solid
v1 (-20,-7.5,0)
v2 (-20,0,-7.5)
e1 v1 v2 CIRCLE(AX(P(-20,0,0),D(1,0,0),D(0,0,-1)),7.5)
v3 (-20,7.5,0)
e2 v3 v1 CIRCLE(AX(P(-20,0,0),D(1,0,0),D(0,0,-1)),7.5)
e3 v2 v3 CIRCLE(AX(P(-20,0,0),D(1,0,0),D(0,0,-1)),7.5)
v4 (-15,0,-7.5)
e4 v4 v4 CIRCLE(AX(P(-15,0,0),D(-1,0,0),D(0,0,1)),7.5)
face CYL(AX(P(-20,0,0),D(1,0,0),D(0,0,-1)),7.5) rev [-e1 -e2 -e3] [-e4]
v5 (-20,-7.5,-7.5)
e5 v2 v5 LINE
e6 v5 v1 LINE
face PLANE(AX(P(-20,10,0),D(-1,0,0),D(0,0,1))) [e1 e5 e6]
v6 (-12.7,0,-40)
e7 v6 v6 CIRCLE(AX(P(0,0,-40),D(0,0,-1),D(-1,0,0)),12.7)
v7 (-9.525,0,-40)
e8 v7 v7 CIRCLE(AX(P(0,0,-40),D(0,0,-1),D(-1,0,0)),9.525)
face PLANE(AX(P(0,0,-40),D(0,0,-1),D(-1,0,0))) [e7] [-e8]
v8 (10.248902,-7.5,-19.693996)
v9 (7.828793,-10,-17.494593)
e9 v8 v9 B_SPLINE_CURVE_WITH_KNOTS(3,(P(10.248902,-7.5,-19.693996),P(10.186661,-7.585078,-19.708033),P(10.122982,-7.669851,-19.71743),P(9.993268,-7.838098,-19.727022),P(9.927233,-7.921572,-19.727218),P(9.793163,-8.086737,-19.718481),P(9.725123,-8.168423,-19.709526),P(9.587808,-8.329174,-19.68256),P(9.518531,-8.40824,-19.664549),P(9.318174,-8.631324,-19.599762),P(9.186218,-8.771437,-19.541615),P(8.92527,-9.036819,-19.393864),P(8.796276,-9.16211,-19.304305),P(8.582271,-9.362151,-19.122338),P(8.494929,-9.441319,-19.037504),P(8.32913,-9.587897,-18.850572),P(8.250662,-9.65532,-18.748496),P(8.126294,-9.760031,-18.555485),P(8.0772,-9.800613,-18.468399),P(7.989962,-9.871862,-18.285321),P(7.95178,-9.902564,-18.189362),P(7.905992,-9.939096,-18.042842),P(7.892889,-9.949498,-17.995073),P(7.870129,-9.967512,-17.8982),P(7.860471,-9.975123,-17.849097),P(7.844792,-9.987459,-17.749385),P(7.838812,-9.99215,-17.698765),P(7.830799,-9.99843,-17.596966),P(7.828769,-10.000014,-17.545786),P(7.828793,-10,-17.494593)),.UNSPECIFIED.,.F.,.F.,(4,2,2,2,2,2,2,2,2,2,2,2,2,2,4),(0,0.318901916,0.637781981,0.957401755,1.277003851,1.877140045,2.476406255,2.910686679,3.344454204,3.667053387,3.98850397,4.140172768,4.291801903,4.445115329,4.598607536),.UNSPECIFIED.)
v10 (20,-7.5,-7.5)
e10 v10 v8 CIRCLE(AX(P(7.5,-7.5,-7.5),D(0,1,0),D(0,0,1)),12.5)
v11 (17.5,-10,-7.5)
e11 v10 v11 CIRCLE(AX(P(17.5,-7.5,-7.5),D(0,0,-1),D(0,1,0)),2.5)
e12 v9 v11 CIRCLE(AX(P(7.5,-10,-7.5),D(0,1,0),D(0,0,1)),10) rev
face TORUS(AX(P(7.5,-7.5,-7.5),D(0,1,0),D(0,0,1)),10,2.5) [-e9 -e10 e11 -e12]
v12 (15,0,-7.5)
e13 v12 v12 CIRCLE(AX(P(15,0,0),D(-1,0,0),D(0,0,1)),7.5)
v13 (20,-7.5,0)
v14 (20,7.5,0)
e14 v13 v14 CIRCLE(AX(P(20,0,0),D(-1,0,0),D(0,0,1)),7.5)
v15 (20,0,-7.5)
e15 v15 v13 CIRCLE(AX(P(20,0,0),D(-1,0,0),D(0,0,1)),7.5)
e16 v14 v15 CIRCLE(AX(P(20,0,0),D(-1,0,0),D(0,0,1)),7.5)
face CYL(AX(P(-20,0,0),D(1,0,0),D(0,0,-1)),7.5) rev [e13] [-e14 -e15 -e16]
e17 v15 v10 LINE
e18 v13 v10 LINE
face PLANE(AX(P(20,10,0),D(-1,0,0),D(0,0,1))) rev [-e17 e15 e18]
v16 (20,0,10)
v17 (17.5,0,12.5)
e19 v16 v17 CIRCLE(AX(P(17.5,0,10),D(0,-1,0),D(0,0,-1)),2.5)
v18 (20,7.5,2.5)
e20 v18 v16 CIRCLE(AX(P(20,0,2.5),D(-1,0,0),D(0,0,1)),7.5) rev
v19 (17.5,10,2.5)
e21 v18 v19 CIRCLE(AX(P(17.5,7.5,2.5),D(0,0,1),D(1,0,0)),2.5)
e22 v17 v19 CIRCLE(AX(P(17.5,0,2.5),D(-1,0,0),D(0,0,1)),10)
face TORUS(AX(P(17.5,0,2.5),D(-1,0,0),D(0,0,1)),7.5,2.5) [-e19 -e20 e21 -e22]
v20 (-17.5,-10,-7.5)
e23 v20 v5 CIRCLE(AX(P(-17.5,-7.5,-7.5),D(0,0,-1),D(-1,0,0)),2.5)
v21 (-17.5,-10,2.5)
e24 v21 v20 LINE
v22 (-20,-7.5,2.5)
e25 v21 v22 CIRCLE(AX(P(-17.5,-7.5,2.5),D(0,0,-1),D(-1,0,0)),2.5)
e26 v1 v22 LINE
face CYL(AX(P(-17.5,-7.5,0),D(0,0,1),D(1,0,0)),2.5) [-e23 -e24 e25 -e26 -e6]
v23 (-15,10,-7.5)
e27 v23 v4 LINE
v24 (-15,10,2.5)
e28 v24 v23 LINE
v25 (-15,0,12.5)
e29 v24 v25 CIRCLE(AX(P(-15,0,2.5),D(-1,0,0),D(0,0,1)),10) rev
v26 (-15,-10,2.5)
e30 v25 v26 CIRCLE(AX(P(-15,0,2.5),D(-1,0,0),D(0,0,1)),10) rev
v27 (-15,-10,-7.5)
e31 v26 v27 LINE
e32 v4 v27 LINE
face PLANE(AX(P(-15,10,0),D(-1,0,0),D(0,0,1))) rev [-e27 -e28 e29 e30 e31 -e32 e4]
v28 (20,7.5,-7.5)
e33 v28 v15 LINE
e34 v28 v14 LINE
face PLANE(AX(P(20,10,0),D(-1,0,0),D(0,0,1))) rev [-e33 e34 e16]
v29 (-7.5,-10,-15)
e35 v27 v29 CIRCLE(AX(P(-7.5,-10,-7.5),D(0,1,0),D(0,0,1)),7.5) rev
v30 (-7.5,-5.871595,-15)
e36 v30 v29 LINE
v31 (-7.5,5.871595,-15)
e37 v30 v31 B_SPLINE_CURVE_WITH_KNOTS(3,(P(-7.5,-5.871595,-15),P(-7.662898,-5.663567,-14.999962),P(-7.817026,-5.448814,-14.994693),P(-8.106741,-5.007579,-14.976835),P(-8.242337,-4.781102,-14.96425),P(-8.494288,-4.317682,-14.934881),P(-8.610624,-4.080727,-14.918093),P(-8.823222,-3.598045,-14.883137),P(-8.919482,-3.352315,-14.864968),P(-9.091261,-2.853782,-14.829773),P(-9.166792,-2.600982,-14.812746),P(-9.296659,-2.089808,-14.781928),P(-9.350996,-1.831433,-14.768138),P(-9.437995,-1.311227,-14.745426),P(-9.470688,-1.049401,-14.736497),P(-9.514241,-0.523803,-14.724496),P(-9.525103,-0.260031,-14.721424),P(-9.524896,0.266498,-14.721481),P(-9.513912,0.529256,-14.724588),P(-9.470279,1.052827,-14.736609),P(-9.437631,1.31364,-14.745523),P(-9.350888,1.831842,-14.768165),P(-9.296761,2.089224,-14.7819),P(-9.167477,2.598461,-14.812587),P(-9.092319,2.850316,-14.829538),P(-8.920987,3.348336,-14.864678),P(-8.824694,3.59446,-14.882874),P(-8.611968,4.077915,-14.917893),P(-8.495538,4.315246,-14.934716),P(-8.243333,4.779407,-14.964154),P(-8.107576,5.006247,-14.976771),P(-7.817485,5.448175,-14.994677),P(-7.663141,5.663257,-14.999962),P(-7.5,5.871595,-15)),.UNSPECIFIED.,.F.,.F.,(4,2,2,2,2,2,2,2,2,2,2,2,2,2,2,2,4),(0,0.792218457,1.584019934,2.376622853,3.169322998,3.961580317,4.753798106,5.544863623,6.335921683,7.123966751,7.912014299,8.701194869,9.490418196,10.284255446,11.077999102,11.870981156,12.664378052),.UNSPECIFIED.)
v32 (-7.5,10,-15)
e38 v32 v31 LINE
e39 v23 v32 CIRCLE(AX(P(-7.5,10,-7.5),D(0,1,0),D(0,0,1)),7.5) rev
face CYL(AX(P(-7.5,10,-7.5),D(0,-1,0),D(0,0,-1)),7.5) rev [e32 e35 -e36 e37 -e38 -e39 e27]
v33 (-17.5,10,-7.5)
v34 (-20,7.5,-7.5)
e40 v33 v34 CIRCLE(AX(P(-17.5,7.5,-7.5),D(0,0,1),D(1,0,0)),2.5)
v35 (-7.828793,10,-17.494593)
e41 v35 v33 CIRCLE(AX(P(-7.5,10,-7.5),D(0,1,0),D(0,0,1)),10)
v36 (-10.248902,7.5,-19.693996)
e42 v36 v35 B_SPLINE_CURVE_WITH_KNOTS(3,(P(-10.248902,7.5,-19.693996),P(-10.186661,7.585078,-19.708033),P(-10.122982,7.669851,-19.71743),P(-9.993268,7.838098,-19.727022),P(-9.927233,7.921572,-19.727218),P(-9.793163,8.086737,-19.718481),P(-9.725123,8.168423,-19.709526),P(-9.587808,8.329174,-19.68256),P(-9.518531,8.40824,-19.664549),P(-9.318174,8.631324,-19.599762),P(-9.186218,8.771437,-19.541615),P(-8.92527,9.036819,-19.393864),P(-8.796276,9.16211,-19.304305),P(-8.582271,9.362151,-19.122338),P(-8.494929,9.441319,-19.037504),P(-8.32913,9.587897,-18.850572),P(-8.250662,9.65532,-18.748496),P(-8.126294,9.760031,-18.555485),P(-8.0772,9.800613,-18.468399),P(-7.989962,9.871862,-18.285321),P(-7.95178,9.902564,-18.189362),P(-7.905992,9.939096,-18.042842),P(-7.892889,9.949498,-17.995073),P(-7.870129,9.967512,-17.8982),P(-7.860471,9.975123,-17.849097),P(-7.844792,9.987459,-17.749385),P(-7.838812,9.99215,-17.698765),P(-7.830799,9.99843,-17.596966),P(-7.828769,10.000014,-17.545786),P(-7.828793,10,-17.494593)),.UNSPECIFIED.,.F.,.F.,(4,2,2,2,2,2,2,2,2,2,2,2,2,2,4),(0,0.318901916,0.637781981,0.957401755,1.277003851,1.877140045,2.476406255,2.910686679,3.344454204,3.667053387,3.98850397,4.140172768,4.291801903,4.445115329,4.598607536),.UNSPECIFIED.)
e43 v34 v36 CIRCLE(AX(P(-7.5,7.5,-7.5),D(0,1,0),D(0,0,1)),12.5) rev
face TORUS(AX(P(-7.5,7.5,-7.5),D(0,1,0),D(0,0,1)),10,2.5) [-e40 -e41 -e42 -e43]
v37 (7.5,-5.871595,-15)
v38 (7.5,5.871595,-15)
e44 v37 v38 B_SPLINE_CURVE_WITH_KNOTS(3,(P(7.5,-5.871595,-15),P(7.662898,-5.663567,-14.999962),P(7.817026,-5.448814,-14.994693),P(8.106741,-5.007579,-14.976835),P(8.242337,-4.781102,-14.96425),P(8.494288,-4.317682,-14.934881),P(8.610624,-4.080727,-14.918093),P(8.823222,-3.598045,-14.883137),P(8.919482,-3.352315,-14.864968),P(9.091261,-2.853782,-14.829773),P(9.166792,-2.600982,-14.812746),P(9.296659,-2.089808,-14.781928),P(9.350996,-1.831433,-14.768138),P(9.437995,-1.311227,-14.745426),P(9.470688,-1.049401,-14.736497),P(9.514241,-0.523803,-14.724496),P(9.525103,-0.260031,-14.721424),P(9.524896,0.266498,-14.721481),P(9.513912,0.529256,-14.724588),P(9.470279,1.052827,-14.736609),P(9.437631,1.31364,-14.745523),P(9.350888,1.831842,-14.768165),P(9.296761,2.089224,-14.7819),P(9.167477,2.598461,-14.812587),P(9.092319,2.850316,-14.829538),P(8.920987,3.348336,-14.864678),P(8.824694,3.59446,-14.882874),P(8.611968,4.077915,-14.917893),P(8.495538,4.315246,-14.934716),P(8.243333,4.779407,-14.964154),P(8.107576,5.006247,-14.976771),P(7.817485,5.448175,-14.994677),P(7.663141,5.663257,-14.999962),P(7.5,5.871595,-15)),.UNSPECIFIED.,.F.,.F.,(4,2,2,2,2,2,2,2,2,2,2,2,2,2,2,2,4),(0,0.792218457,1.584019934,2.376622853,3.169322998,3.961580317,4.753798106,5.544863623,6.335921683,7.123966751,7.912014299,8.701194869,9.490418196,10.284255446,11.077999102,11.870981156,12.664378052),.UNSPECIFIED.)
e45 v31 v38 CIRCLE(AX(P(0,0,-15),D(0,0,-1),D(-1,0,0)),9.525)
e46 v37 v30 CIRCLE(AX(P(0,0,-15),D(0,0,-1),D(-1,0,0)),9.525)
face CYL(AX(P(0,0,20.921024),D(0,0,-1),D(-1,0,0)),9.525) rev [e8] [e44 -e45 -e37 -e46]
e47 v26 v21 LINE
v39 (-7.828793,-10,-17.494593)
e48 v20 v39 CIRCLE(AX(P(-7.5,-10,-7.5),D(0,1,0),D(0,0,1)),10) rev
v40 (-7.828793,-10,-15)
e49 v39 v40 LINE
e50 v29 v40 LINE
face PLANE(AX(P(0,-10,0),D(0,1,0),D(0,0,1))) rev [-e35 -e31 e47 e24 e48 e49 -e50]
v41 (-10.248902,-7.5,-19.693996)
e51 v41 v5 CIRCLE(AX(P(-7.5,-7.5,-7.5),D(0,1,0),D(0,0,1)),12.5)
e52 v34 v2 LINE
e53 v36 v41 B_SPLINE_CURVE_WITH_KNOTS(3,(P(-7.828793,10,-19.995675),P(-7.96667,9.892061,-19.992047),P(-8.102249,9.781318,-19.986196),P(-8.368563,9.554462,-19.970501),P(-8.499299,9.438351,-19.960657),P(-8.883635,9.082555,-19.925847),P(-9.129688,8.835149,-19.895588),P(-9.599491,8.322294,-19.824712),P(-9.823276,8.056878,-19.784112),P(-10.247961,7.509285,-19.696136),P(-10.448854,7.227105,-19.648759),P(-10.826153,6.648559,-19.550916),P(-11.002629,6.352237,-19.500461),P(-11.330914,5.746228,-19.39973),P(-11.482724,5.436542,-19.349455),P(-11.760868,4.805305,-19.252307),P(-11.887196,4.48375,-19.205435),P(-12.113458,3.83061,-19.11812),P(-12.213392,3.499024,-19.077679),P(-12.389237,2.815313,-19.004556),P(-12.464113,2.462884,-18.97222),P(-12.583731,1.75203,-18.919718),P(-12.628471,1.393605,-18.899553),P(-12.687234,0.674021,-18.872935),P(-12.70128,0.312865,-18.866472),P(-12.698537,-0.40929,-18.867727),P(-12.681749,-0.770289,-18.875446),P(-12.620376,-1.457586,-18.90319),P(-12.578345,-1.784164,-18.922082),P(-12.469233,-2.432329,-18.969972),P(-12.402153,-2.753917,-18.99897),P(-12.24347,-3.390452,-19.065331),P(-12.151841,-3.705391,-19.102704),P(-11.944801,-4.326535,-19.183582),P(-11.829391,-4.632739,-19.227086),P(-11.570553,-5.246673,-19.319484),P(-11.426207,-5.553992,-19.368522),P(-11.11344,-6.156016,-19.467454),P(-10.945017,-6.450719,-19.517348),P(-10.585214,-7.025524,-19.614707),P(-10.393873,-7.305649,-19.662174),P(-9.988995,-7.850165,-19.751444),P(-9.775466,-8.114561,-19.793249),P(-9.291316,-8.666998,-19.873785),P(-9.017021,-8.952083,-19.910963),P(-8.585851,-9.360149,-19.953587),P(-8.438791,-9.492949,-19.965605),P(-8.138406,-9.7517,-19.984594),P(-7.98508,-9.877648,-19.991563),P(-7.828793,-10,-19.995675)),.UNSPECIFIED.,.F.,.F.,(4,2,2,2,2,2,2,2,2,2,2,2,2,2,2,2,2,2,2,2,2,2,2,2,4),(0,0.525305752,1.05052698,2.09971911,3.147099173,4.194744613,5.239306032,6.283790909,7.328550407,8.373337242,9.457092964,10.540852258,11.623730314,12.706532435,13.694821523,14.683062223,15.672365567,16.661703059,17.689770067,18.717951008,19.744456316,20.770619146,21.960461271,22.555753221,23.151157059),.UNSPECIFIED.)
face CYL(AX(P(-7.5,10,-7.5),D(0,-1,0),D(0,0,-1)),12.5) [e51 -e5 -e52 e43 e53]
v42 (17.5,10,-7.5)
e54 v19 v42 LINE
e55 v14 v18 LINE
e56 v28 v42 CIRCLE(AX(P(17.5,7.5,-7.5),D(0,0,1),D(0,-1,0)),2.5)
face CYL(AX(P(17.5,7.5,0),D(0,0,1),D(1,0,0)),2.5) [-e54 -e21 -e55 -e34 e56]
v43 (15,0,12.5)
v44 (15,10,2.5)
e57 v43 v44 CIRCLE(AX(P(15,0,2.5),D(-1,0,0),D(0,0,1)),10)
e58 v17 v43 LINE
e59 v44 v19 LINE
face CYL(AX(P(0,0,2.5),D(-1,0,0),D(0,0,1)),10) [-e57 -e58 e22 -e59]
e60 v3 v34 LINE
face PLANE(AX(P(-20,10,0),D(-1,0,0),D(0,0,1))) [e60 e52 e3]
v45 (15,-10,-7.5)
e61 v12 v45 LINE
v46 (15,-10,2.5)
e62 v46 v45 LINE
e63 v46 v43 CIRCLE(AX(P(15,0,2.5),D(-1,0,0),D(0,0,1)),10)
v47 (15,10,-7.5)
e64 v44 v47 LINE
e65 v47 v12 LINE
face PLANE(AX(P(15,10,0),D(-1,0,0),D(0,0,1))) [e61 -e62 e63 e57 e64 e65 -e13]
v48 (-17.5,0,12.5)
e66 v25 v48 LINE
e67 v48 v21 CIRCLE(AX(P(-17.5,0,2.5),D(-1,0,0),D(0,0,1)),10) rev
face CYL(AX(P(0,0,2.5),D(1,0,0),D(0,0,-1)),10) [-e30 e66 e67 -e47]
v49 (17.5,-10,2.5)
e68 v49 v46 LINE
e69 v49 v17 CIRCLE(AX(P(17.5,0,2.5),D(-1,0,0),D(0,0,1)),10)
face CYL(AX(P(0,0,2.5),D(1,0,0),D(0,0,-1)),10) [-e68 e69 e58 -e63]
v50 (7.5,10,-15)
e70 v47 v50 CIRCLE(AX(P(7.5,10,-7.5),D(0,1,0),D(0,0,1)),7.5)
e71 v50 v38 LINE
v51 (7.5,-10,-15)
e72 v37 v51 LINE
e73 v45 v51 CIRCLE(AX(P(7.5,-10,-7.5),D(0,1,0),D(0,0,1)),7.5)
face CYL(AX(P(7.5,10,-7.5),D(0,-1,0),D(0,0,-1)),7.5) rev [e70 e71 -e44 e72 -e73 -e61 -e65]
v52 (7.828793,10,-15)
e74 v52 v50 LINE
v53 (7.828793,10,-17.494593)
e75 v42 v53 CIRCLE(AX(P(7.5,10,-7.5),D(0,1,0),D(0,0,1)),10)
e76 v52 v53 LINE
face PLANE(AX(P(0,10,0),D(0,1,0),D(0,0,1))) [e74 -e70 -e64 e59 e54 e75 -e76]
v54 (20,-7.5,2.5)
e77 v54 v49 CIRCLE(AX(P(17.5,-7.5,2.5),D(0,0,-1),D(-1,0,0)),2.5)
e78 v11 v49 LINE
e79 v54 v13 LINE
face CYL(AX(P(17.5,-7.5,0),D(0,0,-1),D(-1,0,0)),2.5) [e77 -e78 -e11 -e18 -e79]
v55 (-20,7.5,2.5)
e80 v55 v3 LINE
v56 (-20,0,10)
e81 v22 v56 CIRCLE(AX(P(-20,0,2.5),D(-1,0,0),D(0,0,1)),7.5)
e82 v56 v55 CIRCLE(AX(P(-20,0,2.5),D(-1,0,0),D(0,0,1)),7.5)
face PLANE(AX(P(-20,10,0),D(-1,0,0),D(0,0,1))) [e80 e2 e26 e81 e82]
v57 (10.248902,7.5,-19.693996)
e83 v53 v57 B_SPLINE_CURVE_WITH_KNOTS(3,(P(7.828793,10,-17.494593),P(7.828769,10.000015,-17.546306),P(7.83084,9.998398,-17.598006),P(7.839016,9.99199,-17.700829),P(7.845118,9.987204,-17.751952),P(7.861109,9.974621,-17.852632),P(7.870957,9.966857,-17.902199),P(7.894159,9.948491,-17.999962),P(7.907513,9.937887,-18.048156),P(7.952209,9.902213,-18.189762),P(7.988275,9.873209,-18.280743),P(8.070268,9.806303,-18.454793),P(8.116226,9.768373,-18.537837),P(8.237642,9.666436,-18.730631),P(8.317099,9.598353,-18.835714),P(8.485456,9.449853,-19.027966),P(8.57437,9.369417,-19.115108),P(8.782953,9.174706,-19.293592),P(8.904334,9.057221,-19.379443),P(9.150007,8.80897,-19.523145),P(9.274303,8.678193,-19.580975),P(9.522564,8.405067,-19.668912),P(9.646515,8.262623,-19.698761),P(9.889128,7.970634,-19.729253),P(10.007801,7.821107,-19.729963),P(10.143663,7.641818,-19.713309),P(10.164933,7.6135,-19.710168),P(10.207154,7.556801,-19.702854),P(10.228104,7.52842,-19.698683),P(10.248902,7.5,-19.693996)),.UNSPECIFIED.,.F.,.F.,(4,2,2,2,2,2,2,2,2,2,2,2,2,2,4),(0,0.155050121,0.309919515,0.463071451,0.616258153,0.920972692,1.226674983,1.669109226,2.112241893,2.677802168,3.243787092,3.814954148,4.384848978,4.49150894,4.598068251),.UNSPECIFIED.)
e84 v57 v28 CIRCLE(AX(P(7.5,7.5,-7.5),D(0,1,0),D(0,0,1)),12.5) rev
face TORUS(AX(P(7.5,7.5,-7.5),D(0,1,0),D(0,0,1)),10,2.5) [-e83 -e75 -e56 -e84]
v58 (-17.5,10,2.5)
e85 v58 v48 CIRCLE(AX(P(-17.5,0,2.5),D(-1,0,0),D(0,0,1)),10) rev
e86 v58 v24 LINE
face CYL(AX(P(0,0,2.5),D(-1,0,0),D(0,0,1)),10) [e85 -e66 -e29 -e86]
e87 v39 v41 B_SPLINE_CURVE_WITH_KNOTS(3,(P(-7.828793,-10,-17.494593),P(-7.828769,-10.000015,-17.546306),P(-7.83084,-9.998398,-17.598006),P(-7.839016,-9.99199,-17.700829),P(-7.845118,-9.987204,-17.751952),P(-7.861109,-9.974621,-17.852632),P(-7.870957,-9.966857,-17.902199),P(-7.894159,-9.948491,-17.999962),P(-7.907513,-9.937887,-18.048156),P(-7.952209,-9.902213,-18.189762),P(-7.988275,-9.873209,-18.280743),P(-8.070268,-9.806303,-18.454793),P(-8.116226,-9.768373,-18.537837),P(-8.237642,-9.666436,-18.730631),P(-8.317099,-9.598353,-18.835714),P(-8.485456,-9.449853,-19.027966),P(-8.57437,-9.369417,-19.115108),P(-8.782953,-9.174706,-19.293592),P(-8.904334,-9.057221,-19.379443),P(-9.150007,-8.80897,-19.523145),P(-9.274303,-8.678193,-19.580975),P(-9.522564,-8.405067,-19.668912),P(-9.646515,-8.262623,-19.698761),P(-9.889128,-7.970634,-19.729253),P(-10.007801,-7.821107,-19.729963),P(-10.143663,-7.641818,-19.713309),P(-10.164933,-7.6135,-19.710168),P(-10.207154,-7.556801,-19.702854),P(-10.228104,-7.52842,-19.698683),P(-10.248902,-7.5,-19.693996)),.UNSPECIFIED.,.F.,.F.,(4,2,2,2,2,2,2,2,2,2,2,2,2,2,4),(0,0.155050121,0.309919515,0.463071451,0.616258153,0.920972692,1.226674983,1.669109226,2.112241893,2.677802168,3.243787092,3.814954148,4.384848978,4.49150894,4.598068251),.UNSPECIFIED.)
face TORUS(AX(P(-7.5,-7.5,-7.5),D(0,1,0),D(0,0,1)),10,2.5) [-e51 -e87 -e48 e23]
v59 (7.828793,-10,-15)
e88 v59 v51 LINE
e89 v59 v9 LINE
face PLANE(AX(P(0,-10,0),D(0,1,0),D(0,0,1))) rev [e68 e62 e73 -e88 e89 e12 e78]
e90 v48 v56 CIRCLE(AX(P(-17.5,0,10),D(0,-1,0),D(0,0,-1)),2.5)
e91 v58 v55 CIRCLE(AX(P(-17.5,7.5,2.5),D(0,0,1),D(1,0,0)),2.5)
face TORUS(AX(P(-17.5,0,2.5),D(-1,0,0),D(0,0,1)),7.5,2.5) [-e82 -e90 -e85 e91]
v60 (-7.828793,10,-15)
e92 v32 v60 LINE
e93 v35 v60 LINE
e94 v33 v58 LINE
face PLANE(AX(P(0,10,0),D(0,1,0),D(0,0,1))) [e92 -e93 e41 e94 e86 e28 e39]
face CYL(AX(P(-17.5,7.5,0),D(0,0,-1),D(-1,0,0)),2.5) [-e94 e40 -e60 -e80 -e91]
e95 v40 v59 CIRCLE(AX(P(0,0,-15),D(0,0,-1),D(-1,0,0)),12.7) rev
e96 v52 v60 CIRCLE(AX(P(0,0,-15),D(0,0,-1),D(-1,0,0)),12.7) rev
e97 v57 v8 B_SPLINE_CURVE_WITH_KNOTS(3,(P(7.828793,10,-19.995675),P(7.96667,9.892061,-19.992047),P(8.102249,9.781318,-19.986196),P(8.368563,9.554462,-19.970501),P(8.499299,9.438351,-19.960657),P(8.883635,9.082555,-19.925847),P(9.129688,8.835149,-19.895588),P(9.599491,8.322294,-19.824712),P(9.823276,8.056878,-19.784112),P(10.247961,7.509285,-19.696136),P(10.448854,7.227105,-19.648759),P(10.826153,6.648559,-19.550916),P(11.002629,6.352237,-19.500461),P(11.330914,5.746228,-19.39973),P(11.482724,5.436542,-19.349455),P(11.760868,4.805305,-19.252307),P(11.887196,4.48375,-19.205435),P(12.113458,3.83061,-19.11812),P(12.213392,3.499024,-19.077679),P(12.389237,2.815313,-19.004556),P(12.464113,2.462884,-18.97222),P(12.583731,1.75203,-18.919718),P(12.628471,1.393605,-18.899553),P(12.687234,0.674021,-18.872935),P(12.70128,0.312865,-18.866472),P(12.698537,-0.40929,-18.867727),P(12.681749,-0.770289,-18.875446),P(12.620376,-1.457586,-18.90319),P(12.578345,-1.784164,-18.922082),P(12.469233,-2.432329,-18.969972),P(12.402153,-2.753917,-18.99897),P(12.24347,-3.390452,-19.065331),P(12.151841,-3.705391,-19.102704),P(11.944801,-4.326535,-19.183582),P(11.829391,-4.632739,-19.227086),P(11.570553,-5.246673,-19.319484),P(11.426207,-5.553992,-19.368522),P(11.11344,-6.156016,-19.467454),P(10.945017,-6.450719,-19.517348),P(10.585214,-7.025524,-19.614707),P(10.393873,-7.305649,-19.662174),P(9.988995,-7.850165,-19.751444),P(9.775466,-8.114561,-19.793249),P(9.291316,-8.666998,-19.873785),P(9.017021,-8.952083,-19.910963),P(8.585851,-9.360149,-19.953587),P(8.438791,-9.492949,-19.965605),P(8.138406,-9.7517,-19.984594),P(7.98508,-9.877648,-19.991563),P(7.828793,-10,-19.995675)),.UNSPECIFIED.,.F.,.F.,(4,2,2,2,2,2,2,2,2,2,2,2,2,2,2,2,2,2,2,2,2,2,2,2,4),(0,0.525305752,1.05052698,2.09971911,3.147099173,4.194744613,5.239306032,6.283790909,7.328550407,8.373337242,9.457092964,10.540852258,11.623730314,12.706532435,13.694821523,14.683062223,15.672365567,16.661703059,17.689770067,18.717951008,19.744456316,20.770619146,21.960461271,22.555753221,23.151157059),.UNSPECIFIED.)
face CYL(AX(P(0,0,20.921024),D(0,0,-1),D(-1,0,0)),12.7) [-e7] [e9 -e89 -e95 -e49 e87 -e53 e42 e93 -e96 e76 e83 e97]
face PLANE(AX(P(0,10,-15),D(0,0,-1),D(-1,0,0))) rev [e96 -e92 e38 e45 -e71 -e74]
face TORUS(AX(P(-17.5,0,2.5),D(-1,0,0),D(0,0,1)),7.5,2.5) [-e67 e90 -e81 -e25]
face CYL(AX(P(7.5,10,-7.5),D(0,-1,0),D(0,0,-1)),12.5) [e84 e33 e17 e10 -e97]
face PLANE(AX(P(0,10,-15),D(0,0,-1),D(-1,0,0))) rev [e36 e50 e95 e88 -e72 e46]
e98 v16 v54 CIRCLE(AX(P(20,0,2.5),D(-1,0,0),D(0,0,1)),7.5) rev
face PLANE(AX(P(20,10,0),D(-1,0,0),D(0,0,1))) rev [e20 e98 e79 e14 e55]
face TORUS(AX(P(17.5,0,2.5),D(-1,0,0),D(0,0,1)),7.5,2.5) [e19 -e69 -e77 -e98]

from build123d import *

# Parameters (mm, degrees)
BOSS_EXTRUDE1_DEPTH             = 10
CUT_EXTRUDE1_DEPTH              = 46.82575695
CUT_EXTRUDE1_DEPTH_BACK         = 46.82575695
SKETCH2_R                       = 7.5
SKETCH3_R                       = 12.7
SKETCH3_R_2                     = 9.525
BOSS_EXTRUDE2_DEPTH             = 20
BOSS_EXTRUDE2_DIRECTION_2_REACH = 41.449
CUT_EXTRUDE2_DEPTH              = 41.21865247
CUT_EXTRUDE2_DEPTH_BACK         = 41.21865247
FILLET1_R                       = 10
FILLET2_R                       = 2.5


with BuildPart() as part:
    # Sketch1 → Boss-Extrude1 (new, symmetric)
    with BuildSketch(Plane(origin=(0, 0, 0), x_dir=(1, 0, 0), z_dir=(0, 1, 0))):
        with BuildLine():
            Line((-20, 7.5), (-20, 0))
            Line((-20, 0), (-15, 0))
            Line((-15, 0), (-15, 7.5))
            ThreePointArc((-15, 7.5), (-12.803300859, 12.803300859), (-7.5, 15))
            Line((-7.5, 15), (7.5, 15))
            ThreePointArc((7.5, 15), (12.803300859, 12.803300859), (15, 7.5))
            Line((15, 7.5), (15, 0))
            Line((15, 0), (20, 0))
            Line((20, 0), (20, 7.5))
            ThreePointArc((20, 7.5), (16.338834765, 16.338834765), (7.5, 20))
            Line((7.5, 20), (-7.5, 20))
            ThreePointArc((-7.5, 20), (-16.338834765, 16.338834765), (-20, 7.5))
        make_face()
        Polygon((-15, 0), (-20, 0), (-20, -7.5), (-20, -12.5), (-15, -12.5), (-15, -7.5), align=None)
        Polygon((20, 0), (15, 0), (15, -7.5), (15, -12.5), (20, -12.5), (20, -7.5), align=None)
    extrude(amount=BOSS_EXTRUDE1_DEPTH, both=True)

    # Sketch2 → Cut-Extrude1 (cut, two sides: drawn at the far end of the back side and taken through both)
    with BuildSketch(Plane(origin=(20, 0, 0), x_dir=(0, 0, -1), z_dir=(1, 0, 0)).offset(-CUT_EXTRUDE1_DEPTH_BACK)):
        Circle(SKETCH2_R)
    extrude(amount=CUT_EXTRUDE1_DEPTH + CUT_EXTRUDE1_DEPTH_BACK, mode=Mode.SUBTRACT)

    # Sketch3 → Boss-Extrude2 (add)
    with BuildSketch(Plane(origin=(0, 0, -20), x_dir=(-1, 0, 0), z_dir=(0, 0, -1))):
        Circle(SKETCH3_R)
        Circle(SKETCH3_R_2, mode=Mode.SUBTRACT)
    extrude(amount=BOSS_EXTRUDE2_DEPTH)

    # Boss-Extrude2 direction 2: up to this face of the body (flat: up to its plane)
    boss_extrude2_direction_2_end = Plane(part.part.faces().sort_by_distance((0, 0, -15))[0])
    # Sketch3 → Boss-Extrude2 direction 2 (add, up to the picked face)
    with BuildSketch(Plane(origin=(0, 0, -20), x_dir=(-1, 0, 0), z_dir=(0, 0, -1)), mode=Mode.PRIVATE) as boss_extrude2_direction_2_sk1:
        Circle(SKETCH3_R)
        Circle(SKETCH3_R_2, mode=Mode.SUBTRACT)
    boss_extrude2_direction_2_tool1 = split(extrude(boss_extrude2_direction_2_sk1.sketch, amount=-BOSS_EXTRUDE2_DIRECTION_2_REACH, mode=Mode.PRIVATE), bisect_by=boss_extrude2_direction_2_end, keep=Keep.BOTH, mode=Mode.PRIVATE)
    add(boss_extrude2_direction_2_tool1.solids().sort_by(Axis((12.34079, 0, -20), (0, 0, 1)))[0])

    # Sketch3<2> → Cut-Extrude2 (cut, two sides: drawn at the far end of the back side and taken through both)
    with BuildSketch(Plane(origin=(0, 0, -20), x_dir=(-1, 0, 0), z_dir=(0, 0, -1)).offset(-CUT_EXTRUDE2_DEPTH_BACK)):
        with BuildLine():
            Line((7.5, -5.871594758), (7.5, 5.871594758))
            ThreePointArc((7.5, 5.871594758), (0, 9.525), (-7.5, 5.871594758))
            Line((-7.5, 5.871594758), (-7.5, -5.871594758))
            ThreePointArc((-7.5, -5.871594758), (0, -9.525), (7.5, -5.871594758))
        make_face()
        with BuildLine():
            Line((-7.5, -5.871594758), (-7.5, 5.871594758))
            ThreePointArc((-7.5, 5.871594758), (-9.525, 0), (-7.5, -5.871594758))
        make_face()
        with BuildLine():
            ThreePointArc((7.5, -5.871594758), (9.00453011, -3.105489092), (9.525, 0))
            ThreePointArc((9.525, 0), (9.00453011, 3.105489092), (7.5, 5.871594758))
            Line((7.5, 5.871594758), (7.5, -5.871594758))
        make_face()
    extrude(amount=CUT_EXTRUDE2_DEPTH + CUT_EXTRUDE2_DEPTH_BACK, mode=Mode.SUBTRACT)

    # Fillet1
    fillet1_edges = [part.edges().sort_by_distance(p)[0] for p in [
        (17.5, -10, 12.5),
        (-17.5, -10, 12.5),
        (-17.5, 10, 12.5),
        (17.5, 10, 12.5),
    ]]
    fillet(fillet1_edges, radius=FILLET1_R - 0.0001)  # a hair under: the kernel refuses the full size

    # Fillet2
    fillet2_edges = [part.edges().sort_by_distance(p)[0] for p in [
        (20, 10, -2.49995),
        (-20, -10, -2.49995),
        (-20, 10, -2.49995),
        (-20, 7.071097101, 9.571097101),
        (-20, -7.071097101, 9.571097101),
        (16.454326123, -10, -16.221814243),
        (-16.454326123, -10, -16.221814243),
        (-16.454326123, 10, -16.221814243),
        (16.454326123, 10, -16.221814243),
        (20, -10, -2.49995),
        (20, 7.071097101, 9.571097101),
    ]]
    fillet(fillet2_edges, radius=FILLET2_R - 0.0001)  # a hair under: the kernel refuses the full size


solid = part.part
